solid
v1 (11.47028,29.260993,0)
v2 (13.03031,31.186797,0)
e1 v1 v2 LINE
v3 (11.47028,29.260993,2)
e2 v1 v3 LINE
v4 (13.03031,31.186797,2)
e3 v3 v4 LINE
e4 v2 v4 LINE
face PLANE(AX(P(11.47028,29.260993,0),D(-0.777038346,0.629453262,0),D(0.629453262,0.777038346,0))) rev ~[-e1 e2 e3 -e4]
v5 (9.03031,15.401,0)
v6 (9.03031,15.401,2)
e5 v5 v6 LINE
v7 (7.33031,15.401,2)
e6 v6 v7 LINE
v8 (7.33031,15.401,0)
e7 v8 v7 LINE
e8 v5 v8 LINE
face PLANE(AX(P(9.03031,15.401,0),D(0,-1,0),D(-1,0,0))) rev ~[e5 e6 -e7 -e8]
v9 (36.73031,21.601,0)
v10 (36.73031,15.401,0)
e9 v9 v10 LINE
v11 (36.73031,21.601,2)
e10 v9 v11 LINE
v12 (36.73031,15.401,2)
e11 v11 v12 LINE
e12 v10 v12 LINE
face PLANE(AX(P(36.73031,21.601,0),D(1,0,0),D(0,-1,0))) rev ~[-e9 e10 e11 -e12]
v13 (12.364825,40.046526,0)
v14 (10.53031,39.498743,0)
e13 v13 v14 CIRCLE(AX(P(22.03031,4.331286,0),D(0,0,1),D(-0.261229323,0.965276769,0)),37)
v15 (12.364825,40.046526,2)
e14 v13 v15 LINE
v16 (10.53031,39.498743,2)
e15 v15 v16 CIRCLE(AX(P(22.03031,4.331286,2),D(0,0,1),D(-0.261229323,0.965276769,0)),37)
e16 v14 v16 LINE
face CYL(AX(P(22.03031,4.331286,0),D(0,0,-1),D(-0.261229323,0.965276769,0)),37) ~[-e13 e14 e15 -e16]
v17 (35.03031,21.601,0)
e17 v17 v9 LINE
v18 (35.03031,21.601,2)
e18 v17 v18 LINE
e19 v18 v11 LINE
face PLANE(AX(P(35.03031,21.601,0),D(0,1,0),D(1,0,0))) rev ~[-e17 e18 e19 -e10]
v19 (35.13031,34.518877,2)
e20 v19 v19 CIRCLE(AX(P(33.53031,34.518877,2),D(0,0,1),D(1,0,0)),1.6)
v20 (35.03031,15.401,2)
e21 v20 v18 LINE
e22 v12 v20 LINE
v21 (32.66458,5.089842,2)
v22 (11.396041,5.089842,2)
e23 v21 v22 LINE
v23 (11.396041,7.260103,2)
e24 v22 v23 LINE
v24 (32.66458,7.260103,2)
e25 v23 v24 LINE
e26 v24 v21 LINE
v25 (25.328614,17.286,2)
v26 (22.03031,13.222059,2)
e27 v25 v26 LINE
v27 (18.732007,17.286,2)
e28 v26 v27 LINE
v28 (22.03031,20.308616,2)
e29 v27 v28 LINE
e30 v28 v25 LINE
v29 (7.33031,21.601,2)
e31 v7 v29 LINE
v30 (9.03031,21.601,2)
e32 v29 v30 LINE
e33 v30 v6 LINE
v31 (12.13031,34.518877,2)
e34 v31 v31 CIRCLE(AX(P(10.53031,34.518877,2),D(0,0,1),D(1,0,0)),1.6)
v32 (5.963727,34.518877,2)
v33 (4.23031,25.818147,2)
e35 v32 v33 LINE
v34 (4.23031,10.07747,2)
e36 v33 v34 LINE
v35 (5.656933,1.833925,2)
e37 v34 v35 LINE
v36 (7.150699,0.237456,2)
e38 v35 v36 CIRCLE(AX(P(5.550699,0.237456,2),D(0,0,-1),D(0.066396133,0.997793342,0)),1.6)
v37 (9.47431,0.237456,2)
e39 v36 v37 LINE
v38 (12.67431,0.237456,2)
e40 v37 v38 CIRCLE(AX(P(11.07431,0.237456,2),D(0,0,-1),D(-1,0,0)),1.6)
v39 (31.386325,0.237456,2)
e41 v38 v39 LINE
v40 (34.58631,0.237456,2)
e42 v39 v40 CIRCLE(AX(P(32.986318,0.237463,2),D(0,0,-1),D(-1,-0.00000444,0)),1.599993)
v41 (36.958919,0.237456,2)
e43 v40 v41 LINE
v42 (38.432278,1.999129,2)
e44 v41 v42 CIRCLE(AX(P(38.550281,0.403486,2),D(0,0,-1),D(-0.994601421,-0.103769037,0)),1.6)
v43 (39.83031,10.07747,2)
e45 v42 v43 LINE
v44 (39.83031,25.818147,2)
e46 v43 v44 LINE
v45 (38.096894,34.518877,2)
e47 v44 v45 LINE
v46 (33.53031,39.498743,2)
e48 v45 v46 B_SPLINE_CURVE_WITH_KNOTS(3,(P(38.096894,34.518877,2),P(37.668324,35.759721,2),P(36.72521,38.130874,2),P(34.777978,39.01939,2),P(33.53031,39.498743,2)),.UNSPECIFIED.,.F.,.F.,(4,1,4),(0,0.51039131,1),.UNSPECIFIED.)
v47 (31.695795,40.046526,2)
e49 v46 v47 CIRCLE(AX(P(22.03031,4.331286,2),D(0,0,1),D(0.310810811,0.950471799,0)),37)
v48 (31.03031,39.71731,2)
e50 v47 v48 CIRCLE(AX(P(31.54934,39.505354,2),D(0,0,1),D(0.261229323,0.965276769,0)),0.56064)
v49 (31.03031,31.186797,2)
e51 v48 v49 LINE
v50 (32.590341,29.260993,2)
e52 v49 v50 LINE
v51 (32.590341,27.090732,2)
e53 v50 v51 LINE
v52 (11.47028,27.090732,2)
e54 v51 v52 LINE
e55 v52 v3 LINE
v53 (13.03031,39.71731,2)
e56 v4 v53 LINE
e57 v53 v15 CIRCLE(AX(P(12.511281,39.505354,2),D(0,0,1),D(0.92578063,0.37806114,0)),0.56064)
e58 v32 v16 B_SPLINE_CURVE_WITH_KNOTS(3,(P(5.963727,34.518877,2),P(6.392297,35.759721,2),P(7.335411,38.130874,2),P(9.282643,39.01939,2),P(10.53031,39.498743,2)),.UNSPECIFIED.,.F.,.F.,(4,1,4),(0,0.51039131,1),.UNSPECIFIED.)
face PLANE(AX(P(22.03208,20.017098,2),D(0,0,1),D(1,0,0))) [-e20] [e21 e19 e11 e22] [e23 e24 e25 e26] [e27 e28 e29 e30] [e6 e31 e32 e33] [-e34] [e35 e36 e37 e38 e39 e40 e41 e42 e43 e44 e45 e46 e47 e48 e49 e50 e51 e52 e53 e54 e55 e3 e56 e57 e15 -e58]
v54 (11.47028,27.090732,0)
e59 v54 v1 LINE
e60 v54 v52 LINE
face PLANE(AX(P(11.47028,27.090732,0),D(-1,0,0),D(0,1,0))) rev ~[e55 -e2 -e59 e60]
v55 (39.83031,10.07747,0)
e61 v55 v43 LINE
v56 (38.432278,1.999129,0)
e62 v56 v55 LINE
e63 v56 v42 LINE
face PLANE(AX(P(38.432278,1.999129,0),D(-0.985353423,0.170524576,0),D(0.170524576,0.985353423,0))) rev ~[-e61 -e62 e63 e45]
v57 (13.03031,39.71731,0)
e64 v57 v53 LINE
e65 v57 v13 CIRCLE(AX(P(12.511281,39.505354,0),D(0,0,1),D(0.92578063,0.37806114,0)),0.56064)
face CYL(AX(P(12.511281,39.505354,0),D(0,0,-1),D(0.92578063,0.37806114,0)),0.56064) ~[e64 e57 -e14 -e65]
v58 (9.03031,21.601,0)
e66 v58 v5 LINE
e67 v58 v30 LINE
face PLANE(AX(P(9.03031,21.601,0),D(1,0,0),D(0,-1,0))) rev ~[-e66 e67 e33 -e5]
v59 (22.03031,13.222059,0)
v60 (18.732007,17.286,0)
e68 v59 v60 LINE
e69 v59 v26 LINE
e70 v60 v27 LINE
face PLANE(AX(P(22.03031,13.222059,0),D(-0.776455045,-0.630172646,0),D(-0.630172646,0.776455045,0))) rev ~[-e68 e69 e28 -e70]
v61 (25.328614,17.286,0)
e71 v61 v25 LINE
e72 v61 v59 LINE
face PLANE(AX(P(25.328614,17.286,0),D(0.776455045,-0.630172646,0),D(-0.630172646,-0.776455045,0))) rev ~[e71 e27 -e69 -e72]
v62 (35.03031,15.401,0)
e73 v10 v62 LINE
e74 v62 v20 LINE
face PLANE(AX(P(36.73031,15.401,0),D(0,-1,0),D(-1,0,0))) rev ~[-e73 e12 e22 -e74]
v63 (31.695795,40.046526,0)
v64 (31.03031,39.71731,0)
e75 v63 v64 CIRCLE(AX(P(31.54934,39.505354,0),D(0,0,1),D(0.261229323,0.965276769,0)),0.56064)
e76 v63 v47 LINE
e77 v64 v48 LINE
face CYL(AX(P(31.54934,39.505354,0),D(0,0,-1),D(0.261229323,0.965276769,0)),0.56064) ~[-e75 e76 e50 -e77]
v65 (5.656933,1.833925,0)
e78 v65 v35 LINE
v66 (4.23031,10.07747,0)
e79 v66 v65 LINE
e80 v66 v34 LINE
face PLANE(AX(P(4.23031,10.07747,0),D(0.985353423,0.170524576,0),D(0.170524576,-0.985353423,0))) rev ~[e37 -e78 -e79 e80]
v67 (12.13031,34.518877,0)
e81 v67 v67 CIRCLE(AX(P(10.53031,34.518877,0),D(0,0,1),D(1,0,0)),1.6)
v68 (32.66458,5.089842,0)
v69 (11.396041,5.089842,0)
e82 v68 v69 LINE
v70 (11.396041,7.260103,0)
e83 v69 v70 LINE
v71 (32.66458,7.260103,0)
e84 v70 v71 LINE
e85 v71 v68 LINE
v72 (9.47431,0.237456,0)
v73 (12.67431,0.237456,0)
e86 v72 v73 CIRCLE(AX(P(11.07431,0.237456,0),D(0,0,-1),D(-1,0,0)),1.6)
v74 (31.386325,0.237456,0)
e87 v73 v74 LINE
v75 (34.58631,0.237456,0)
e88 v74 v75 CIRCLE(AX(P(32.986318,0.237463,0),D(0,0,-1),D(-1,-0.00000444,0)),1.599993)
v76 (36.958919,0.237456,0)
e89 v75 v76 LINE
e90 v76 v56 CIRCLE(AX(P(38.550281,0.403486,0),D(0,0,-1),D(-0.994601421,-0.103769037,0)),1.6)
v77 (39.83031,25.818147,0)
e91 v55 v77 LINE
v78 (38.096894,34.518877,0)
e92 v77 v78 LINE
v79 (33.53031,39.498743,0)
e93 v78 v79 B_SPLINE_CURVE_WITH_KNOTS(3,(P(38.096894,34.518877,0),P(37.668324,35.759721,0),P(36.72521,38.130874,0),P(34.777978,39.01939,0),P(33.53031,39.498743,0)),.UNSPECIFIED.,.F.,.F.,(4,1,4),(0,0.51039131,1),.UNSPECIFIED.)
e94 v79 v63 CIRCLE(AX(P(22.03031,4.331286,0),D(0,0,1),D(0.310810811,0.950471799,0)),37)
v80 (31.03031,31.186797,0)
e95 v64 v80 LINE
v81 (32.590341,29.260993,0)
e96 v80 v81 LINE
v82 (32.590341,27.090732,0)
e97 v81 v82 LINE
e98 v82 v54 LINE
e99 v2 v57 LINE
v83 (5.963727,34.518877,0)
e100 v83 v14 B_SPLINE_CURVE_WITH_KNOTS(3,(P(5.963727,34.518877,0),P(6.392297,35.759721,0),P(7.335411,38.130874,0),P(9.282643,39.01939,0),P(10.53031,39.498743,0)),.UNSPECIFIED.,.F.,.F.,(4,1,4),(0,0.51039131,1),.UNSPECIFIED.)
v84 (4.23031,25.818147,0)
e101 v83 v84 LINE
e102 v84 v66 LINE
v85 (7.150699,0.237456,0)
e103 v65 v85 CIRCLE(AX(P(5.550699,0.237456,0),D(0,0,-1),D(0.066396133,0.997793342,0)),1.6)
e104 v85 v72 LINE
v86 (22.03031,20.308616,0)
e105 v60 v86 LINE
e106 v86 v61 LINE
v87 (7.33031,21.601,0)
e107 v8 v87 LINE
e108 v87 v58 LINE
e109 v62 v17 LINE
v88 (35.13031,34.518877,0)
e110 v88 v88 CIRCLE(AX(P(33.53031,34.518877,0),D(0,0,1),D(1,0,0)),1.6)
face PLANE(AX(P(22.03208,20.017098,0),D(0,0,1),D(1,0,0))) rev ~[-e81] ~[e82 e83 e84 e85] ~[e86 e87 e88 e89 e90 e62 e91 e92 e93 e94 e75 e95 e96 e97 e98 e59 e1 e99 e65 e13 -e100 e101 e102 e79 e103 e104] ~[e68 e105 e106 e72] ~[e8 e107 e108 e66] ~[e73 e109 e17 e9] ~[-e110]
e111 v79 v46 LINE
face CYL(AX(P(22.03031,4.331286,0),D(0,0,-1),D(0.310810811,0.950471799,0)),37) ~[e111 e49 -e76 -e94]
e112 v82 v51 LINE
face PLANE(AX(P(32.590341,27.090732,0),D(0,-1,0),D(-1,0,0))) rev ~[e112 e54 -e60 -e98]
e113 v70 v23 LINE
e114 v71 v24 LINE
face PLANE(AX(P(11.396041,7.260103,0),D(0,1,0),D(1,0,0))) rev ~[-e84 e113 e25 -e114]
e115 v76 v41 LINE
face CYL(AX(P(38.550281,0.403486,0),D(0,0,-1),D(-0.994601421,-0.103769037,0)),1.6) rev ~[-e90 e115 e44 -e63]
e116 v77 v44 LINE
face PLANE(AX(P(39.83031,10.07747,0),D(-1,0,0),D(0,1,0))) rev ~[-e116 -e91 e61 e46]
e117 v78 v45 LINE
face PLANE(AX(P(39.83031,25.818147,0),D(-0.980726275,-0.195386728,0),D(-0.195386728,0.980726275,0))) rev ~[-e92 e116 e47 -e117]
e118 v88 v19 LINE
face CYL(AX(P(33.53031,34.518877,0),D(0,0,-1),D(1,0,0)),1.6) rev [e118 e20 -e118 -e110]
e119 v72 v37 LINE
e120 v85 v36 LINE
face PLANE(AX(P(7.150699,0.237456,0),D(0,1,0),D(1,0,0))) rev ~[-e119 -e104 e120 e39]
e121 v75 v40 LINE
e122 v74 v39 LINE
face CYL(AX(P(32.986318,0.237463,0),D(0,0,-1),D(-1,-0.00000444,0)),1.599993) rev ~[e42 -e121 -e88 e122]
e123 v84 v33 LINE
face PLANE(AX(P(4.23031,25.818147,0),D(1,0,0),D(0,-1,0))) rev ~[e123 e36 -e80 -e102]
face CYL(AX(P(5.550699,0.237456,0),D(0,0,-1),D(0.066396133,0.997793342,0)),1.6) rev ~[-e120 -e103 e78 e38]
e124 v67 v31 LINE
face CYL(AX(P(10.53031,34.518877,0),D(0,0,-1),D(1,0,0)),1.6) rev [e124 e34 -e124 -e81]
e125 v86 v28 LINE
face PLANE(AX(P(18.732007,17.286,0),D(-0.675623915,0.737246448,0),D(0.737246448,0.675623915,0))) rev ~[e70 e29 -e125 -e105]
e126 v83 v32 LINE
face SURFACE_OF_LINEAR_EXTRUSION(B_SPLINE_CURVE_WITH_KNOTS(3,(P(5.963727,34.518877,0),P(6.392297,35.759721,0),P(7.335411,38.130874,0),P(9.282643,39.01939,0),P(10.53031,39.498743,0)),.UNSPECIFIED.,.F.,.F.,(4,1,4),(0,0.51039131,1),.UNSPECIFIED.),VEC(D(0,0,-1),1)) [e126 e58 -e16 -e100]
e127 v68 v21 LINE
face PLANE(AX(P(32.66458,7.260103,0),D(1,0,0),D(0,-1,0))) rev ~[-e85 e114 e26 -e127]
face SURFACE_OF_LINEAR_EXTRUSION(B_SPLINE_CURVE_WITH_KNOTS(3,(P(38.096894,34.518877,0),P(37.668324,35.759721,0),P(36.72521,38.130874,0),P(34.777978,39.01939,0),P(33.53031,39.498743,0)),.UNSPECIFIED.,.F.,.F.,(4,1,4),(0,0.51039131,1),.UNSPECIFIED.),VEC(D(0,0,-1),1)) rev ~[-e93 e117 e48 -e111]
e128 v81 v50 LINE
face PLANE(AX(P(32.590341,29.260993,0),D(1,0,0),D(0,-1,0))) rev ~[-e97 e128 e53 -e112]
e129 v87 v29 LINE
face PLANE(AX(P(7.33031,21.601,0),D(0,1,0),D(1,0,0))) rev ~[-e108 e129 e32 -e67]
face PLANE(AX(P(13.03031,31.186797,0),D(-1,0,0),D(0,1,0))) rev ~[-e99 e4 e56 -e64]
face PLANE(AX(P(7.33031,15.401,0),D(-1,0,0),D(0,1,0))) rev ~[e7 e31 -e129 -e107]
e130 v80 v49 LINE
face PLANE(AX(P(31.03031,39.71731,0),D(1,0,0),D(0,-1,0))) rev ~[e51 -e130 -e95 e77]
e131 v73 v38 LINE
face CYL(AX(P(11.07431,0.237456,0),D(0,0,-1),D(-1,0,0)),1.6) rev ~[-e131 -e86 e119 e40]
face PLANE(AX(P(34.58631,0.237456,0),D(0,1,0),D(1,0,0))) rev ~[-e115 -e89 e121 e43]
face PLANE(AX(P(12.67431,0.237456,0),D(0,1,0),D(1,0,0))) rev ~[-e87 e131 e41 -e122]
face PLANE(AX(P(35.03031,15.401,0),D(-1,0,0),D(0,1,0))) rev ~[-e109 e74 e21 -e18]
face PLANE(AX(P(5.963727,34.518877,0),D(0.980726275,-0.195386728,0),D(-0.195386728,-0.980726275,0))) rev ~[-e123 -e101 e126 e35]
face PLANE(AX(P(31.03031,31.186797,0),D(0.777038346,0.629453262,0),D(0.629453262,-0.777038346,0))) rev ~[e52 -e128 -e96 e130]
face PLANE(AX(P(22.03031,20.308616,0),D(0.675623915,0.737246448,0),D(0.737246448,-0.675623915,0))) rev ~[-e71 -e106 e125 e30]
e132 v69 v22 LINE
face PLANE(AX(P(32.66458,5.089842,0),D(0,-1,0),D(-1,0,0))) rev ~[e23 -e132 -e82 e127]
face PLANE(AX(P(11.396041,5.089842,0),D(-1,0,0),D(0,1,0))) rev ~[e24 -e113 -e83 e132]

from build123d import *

# Parameters (mm, degrees)
F0_R     = 1.6
F1_DEPTH = 2


# Not quite as in the source:
# - ends of sketch curves that miss each other by under 0.0002 mm in the source are joined


with BuildPart() as f1:
    # F0 (on Top) → F1 (new body)
    with BuildSketch(Plane.XY):
        with BuildLine():
            ThreePointArc((9.4743104318, 0.2374556452), (11.0743104318, 1.8374556452), (12.6743104318, 0.2374556452))
            Line((12.6743104318, 0.2374556452), (22.0509076786, 0.2374556452))
            Line((22.0509076786, 0.2374556452), (31.3863246398, 0.2374556452))
            ThreePointArc((31.3863246398, 0.2374556452), (32.9863104318, 1.8374556452), (34.5863104318, 0.2374556452))
            Line((34.5863104318, 0.2374556452), (36.9589188956, 0.2374556452))
            ThreePointArc((36.9589188956, 0.2374556452), (37.322944486, 1.4299580557), (38.4322782501, 1.9991287063))
            Line((38.4322782501, 1.9991287063), (39.8303104318, 10.0774704438))
            Line((39.8303104318, 10.0774704438), (39.8303104318, 25.8181473703))
            Line((39.8303104318, 25.8181473703), (38.0968938881, 34.5188772837))
            add(Edge.make_bspline(
                [(38.0968938881, 34.5188772837), (37.6683242364, 35.7597207754), (36.7252101224, 38.130874007), (34.7779775897, 39.0193902227), (33.5303104318, 39.4987425759)],
                knots=[0, 0, 0, 0, 0.51039131, 1, 1, 1, 1], degree=3))
            ThreePointArc((33.5303104318, 39.4987425759), (32.6165966127, 39.7845023129), (31.6957953827, 40.0465264824))
            ThreePointArc((31.6957953827, 40.0465264824), (31.3007464304, 40.007865889), (31.0303104318, 39.7173100649))
            Line((31.0303104318, 39.7173100649), (31.0303104318, 34.5188772837))
            Line((31.0303104318, 34.5188772837), (31.0303104318, 31.1867967248))
            Line((31.0303104318, 31.1867967248), (32.5903408229, 29.2609930038))
            Line((32.5903408229, 29.2609930038), (32.5903408229, 27.0907320082))
            Line((32.5903408229, 27.0907320082), (22.0303104318, 27.0907320082))
            Line((22.0303104318, 27.0907320082), (11.4702800406, 27.0907320082))
            Line((11.4702800406, 27.0907320082), (11.4702800406, 29.2609930038))
            Line((11.4702800406, 29.2609930038), (13.0303104318, 31.1867967248))
            Line((13.0303104318, 31.1867967248), (13.0303104318, 34.5188772837))
            Line((13.0303104318, 34.5188772837), (13.0303104318, 39.7173100649))
            ThreePointArc((13.0303104318, 39.7173100649), (12.7598744332, 40.007865889), (12.3648254809, 40.0465264824))
            ThreePointArc((12.3648254809, 40.0465264824), (11.4440242509, 39.7845023129), (10.5303104318, 39.4987425759))
            add(Edge.make_bspline(
                [(5.9637269754, 34.5188772837), (6.3922966272, 35.7597207754), (7.3354107411, 38.130874007), (9.2826432739, 39.0193902227), (10.5303104318, 39.4987425759)],
                knots=[0, 0, 0, 0, 0.51039131, 1, 1, 1, 1], degree=3))
            Line((5.9637269754, 34.5188772837), (4.2303104318, 25.8181473703))
            Line((4.2303104318, 25.8181473703), (4.2303104318, 10.0774704438))
            Line((4.2303104318, 10.0774704438), (5.6569326528, 1.8339249926))
            ThreePointArc((5.6569326528, 1.8339249926), (6.7190254428, 1.3306221238), (7.1506988404, 0.2374556452))
            Line((7.1506988404, 0.2374556452), (9.4743104318, 0.2374556452))
        make_face()
        Polygon((11.5445189413, 7.2601027762), (22.0303104318, 7.2601027762), (32.5161019223, 7.2601027762), (32.6645797236, 7.2601027762), (32.6645797236, 5.0898417806), (32.5161019223, 5.0898417806), (11.5445189413, 5.0898417806), (11.39604114, 5.0898417806), (11.39604114, 7.2601027762), align=None, mode=Mode.SUBTRACT)
        Polygon((18.7320070459, 17.286), (22.0303104318, 20.3086156398), (25.3286138177, 17.286), (22.0303104318, 13.222059235), align=None, mode=Mode.SUBTRACT)
        Polygon((8.1803104318, 15.401), (7.3303104318, 15.401), (7.3303104318, 21.601), (8.1803104318, 21.601), (9.0303104318, 21.601), (9.0303104318, 15.401), align=None, mode=Mode.SUBTRACT)
        with Locations((10.5303104318, 34.5188772837)):
            Circle(F0_R, mode=Mode.SUBTRACT)
        Polygon((35.0303104318, 15.401), (35.0303104318, 21.601), (35.8803104318, 21.601), (36.7303104318, 21.601), (36.7303104318, 15.401), (35.8803104318, 15.401), align=None, mode=Mode.SUBTRACT)
        with Locations((33.5303104318, 34.5188772837)):
            Circle(F0_R, mode=Mode.SUBTRACT)
    extrude(amount=F1_DEPTH)


solid = f1.part
